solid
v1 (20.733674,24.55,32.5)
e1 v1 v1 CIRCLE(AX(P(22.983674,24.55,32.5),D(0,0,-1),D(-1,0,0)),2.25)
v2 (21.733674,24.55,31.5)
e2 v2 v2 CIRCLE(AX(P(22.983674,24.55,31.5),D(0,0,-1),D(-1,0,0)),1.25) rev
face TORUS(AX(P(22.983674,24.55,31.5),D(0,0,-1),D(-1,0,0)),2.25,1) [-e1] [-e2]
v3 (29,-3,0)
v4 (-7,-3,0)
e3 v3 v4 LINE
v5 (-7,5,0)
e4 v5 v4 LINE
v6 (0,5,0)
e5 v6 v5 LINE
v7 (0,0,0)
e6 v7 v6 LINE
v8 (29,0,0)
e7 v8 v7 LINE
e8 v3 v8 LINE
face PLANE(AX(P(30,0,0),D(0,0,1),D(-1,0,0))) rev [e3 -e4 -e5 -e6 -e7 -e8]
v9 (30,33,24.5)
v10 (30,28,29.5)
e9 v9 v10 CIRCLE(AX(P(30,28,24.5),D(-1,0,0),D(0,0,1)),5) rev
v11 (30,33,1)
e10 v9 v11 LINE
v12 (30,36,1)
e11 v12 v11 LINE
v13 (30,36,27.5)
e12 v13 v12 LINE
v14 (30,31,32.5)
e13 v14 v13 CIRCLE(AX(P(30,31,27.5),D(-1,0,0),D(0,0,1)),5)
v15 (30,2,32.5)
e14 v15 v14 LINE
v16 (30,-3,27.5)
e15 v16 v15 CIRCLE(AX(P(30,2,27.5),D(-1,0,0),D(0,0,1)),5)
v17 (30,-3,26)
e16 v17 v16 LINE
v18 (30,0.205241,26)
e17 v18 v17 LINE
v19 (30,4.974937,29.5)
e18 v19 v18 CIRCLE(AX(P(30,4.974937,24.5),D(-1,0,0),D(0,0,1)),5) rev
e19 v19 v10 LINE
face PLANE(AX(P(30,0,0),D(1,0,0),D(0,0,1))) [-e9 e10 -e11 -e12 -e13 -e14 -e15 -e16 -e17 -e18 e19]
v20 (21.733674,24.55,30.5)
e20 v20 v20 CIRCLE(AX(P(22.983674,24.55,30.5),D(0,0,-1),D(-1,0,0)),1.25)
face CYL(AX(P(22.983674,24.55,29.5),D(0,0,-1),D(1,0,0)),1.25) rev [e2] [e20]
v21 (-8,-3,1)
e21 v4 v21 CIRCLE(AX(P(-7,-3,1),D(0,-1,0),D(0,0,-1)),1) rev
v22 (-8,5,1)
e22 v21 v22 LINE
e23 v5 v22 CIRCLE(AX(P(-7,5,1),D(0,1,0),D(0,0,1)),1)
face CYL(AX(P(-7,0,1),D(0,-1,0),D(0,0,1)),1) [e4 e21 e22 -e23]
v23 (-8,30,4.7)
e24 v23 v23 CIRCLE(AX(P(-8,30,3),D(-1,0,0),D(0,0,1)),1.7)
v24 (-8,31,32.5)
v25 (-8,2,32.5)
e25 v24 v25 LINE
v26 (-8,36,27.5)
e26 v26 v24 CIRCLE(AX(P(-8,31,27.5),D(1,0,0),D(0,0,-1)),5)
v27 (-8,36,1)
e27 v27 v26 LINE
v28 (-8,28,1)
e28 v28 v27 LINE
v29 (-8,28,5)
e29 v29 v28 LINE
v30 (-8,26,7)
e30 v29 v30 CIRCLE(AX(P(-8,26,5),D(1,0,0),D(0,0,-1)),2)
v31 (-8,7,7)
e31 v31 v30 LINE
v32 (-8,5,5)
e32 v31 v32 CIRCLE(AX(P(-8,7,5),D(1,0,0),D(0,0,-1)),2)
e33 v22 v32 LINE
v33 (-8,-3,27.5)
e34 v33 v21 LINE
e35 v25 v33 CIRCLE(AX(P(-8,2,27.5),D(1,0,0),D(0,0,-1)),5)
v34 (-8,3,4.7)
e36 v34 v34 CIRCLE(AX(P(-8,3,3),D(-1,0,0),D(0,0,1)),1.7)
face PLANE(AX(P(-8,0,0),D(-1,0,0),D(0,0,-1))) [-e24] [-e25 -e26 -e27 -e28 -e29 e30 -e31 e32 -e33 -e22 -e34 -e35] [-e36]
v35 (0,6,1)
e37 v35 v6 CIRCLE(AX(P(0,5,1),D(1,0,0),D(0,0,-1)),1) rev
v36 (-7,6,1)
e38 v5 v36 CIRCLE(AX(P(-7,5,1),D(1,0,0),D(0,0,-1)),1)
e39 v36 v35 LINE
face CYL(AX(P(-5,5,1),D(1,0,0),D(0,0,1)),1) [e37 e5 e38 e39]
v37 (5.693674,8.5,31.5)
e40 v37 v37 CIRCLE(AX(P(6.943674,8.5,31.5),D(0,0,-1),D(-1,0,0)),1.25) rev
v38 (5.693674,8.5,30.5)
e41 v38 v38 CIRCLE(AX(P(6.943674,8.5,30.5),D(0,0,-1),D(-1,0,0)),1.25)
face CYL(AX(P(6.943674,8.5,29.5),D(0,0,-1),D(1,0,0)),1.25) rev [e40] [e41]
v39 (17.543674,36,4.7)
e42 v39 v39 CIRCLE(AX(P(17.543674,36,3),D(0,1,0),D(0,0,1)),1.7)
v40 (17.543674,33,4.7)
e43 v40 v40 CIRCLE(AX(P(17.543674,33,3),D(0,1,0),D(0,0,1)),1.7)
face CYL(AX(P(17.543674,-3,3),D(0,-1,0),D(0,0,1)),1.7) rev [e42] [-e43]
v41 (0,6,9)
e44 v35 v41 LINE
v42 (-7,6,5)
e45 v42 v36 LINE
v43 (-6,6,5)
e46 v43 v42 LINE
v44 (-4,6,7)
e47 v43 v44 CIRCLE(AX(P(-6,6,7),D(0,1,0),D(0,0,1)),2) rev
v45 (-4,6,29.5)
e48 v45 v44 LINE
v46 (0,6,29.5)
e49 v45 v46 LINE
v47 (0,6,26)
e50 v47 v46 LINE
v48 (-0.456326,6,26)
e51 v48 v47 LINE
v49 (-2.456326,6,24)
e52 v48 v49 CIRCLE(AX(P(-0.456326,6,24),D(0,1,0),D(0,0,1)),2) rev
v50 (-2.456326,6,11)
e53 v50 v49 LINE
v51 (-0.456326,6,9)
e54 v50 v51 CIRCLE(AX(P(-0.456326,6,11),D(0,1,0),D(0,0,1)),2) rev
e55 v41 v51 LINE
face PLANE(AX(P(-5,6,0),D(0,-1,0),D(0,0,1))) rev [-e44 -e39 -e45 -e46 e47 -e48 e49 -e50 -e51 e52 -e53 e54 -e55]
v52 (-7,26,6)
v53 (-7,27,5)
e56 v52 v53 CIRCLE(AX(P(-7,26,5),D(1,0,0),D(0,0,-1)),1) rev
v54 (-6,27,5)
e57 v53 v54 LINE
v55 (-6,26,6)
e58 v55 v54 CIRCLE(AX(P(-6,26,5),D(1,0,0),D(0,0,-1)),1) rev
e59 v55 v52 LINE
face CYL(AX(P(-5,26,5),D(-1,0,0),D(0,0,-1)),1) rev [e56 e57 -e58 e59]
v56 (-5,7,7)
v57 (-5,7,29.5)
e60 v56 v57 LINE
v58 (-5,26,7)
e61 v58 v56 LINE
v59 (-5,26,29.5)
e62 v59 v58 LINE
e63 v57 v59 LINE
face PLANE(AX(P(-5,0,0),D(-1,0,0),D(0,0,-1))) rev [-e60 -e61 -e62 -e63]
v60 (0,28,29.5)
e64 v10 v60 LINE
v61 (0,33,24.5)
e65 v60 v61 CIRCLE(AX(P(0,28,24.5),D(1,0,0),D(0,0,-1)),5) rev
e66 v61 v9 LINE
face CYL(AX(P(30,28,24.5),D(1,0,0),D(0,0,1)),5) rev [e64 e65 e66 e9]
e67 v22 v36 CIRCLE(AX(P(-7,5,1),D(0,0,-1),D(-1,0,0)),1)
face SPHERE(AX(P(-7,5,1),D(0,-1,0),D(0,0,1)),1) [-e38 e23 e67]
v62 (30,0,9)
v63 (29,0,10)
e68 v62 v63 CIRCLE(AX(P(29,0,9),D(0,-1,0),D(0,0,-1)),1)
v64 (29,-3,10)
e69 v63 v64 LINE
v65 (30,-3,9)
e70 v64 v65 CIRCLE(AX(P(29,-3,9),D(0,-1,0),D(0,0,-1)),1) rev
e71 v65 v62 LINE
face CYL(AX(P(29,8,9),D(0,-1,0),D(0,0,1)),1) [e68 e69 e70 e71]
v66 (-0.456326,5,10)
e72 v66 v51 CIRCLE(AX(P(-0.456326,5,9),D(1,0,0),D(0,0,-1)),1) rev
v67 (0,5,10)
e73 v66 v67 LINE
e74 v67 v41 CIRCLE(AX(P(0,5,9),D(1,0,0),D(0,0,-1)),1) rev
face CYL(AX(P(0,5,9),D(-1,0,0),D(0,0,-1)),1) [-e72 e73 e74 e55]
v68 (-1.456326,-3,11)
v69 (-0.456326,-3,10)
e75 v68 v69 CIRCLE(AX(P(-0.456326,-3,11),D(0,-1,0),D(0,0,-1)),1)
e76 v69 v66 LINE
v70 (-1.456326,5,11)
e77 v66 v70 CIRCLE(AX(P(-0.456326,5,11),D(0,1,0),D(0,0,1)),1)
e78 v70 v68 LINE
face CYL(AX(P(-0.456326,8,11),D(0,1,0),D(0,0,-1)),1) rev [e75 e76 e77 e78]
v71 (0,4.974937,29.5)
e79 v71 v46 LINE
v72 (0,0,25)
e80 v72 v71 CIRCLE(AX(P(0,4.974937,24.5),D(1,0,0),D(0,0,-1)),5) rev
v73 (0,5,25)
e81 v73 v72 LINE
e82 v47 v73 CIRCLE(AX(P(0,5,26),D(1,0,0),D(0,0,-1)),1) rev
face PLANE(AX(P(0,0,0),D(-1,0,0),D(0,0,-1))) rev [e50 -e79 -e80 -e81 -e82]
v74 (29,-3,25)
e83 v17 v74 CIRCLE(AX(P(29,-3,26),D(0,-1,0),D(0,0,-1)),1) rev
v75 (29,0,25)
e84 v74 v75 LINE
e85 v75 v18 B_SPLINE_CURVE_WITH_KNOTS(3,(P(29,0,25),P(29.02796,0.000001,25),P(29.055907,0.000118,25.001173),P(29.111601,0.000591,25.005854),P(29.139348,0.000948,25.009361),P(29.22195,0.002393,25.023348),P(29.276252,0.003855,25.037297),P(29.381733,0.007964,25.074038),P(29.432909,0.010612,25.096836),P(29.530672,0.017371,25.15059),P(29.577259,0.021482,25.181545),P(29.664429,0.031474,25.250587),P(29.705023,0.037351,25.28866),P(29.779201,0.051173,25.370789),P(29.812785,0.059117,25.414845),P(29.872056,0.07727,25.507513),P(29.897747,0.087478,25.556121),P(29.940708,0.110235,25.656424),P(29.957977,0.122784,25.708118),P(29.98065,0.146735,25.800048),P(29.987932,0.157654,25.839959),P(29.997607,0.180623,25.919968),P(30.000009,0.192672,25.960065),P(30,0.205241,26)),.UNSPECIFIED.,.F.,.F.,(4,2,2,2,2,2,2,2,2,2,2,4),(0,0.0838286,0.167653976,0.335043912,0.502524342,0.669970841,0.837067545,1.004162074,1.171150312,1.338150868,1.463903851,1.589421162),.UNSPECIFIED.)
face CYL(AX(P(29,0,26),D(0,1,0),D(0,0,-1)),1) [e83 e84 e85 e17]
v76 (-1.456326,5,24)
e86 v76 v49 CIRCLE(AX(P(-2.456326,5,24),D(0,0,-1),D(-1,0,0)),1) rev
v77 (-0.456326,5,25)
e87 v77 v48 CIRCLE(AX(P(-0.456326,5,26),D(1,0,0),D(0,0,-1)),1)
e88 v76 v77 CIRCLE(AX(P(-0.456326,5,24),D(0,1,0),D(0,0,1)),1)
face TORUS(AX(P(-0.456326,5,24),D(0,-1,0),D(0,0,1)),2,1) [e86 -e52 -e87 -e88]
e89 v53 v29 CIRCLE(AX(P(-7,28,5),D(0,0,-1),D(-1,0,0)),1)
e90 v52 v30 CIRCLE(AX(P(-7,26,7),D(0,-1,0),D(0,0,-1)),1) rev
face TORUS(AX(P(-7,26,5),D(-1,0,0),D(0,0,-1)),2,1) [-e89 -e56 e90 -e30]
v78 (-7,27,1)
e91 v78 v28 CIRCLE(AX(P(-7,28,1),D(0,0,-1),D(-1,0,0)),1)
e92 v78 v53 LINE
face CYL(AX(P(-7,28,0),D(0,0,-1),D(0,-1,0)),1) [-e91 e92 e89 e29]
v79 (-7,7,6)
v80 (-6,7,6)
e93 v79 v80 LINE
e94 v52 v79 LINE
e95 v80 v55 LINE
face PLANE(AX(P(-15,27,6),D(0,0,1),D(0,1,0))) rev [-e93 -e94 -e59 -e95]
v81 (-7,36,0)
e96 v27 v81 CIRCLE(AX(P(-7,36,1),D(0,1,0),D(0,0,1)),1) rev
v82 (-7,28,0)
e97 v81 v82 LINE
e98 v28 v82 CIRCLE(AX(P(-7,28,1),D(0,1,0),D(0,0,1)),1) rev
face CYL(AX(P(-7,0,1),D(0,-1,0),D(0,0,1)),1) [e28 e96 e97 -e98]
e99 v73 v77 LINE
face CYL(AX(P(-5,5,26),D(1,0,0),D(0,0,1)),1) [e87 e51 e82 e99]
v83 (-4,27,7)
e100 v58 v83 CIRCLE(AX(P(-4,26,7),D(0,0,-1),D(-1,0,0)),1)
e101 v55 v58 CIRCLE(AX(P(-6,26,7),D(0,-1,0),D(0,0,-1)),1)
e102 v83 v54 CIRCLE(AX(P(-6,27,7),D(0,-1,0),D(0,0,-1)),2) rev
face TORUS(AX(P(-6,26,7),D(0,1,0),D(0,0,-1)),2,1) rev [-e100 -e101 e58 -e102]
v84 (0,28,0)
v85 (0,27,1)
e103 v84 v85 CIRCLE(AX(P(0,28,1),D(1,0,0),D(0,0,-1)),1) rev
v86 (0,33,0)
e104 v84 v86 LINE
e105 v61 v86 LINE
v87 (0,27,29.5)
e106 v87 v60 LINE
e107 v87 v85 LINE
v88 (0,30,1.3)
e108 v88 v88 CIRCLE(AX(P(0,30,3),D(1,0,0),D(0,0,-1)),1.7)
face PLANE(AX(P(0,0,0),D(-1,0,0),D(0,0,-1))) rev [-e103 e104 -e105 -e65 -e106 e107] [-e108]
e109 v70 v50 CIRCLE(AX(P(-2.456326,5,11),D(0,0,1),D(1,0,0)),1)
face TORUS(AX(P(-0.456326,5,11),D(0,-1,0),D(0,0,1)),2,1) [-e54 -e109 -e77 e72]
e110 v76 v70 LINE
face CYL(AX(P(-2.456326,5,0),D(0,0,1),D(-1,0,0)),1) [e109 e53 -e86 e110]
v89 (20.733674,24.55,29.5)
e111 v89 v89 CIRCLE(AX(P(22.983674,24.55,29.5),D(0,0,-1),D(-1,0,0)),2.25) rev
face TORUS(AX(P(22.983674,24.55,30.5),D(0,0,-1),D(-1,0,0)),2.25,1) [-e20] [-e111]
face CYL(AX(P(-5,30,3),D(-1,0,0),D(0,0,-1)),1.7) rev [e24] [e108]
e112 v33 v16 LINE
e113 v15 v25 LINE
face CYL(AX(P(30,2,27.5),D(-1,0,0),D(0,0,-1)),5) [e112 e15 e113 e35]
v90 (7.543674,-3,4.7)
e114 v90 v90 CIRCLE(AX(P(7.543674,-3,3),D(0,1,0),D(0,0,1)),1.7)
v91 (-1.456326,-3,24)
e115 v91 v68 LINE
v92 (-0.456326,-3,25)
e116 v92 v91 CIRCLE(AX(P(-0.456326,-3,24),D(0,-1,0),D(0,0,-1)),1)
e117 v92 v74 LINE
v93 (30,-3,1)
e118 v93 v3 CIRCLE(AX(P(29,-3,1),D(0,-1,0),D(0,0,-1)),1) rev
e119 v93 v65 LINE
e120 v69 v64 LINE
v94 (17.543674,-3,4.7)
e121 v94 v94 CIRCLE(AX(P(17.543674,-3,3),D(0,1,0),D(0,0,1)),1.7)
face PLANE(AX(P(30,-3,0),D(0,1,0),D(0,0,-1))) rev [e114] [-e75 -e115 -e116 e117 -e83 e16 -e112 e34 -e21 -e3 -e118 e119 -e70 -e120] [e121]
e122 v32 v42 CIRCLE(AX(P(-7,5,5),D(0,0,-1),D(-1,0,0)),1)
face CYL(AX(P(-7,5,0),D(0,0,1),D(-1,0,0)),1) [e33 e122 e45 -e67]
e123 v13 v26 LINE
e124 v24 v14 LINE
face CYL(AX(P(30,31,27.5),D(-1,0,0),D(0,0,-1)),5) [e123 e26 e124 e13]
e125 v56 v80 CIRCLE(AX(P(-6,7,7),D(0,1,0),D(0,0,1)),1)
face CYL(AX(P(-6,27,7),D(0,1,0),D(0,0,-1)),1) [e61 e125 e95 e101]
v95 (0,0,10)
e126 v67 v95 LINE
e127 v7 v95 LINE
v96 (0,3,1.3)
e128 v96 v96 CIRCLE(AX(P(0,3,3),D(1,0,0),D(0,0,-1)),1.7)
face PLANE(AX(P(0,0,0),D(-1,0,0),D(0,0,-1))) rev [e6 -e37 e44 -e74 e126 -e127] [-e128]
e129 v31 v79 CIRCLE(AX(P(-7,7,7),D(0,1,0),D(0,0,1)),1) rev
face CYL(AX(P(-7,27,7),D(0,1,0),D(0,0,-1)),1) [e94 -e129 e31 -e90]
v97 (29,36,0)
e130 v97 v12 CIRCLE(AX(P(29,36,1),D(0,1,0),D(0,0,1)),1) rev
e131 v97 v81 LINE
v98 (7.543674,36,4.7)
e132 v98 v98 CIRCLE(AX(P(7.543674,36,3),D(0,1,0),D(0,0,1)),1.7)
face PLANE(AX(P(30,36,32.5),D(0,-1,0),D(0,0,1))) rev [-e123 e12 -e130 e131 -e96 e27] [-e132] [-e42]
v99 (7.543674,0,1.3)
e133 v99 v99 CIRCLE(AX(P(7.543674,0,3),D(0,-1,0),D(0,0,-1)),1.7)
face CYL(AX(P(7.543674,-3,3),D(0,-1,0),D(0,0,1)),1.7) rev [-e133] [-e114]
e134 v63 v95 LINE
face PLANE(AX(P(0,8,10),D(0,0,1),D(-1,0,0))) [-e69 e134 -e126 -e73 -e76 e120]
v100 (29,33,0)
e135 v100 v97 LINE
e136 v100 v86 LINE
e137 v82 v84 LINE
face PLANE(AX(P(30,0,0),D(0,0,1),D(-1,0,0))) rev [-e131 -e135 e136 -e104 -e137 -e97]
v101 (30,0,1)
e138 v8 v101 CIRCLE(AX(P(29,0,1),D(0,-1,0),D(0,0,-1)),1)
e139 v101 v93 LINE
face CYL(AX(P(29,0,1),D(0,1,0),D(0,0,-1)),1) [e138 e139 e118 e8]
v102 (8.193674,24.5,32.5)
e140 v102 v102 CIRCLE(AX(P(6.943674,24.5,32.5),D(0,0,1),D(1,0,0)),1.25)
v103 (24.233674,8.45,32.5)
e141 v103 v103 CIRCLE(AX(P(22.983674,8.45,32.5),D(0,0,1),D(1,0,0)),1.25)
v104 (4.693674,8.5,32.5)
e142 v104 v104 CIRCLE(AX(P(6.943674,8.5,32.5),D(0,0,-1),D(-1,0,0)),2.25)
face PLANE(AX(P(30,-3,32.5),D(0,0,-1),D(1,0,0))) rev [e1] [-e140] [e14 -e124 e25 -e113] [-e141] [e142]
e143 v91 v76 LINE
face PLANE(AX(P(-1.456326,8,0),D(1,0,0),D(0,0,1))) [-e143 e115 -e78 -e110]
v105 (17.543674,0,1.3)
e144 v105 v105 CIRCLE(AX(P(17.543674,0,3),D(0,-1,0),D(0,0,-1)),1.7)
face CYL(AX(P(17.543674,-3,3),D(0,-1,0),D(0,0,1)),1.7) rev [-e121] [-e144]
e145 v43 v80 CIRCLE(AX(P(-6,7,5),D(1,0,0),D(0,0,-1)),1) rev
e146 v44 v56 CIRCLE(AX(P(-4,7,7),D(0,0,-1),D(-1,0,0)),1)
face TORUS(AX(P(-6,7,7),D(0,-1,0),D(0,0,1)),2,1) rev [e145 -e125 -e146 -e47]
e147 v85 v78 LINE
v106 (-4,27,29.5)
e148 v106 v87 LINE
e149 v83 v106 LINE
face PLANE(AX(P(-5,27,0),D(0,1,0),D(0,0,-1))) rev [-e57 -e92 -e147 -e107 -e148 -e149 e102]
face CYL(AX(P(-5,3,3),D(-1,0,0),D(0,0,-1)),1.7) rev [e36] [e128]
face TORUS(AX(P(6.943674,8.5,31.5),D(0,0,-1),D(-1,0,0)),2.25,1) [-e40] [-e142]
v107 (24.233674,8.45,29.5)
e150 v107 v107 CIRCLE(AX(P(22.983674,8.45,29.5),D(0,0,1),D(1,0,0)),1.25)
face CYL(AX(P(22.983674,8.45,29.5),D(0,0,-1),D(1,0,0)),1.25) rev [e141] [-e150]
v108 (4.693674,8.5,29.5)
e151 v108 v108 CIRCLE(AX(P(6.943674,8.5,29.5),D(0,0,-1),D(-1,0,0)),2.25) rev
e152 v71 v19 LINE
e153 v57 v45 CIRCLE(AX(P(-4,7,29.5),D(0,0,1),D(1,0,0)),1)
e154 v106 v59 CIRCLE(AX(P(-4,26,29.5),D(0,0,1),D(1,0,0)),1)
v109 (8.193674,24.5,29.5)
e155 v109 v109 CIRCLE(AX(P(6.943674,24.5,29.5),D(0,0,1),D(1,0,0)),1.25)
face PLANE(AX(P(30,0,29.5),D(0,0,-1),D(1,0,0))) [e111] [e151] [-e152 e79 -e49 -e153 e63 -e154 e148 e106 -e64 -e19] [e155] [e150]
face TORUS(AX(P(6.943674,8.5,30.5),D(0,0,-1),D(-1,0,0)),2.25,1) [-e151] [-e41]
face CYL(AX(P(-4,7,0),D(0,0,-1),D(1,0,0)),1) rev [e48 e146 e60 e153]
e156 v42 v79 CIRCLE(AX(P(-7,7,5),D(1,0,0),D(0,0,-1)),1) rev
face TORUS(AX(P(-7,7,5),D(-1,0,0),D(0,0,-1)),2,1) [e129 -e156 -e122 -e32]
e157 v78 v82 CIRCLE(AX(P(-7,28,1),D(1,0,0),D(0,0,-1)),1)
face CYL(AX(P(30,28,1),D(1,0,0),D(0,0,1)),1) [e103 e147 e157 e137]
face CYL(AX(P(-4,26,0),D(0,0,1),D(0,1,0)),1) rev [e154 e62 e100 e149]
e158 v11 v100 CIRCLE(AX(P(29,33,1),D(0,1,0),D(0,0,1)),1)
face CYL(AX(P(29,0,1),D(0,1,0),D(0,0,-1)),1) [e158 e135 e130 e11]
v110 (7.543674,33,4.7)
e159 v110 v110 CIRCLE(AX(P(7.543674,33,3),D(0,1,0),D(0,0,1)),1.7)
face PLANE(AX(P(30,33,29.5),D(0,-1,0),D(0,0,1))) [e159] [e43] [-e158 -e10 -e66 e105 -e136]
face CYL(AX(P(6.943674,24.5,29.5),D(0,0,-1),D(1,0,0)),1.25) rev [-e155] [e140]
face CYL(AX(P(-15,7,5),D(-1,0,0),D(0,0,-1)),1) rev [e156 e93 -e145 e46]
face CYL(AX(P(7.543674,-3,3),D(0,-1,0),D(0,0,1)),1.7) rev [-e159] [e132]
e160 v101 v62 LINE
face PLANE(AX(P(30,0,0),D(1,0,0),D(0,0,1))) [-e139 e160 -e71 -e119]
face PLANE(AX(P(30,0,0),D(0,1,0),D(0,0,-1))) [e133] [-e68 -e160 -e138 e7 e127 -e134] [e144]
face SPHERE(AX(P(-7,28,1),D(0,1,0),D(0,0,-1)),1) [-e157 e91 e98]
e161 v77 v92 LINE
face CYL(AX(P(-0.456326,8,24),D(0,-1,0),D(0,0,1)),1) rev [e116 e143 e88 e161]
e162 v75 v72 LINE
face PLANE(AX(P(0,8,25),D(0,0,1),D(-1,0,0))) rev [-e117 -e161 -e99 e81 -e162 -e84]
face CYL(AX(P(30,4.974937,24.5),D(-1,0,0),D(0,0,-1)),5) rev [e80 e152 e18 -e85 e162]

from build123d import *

# Parameters (mm, degrees)
EXTRUDE_1_DEPTH     = 30
HOLE_WIZARD_M4_1_D  = 2.5
SKETCH_13_W         = 3
SKETCH_13_H         = 21
SKETCH_13_W_2       = 29.5
SKETCH_13_H_2       = 6
EXTRUDE_2_DEPTH     = 5
HOLE_WIZARD_M3_1_D  = 3.4
HOLE_WIZARD_M3_2_D  = 3.4
SKETCH_18_W         = 33
SKETCH_18_H         = 15
CUT_EXTRUDE_1_DEPTH = 11
SKETCH_20_W         = 32.5
SKETCH_20_H         = 39
EXTRUDE_3_DEPTH     = 3
FILLET_3_R          = 5
FILLET_4_R          = 5
FILLET_5_R          = 1
HOLE_WIZARD_M3_3_D  = 3.4
SKETCH_25_W         = 6
SKETCH_25_H         = 21
CUT_EXTRUDE_3_DEPTH = 10
FILLET_6_R          = 1
FILLET1_R           = 1


with BuildPart() as part:
    # 草图1 → 凸台-拉伸1 (new body)
    with BuildSketch(Plane(origin=(0, 0, 0), x_dir=(0, 0, -1), z_dir=(1, 0, 0))):
        Polygon((0, 0), (29.5, 0), (29.5, 33), (0, 33), (0, 36), (32.5, 36), (32.5, -3), (0, -3), align=None)
    extrude(amount=EXTRUDE_1_DEPTH)

    # M4 间隙孔1 (through all)
    with Locations(Plane.XY.offset(-29.5)):
        with Locations((6.943673968, 24.5), (22.983673968, 24.55), (6.943673968, 8.5), (22.983673968, 8.45)):
            Hole(HOLE_WIZARD_M4_1_D / 2)

    # 草图13 → 凸台-拉伸2 (add)
    with BuildSketch(Plane(origin=(0, 0, 0), x_dir=(0, 0, -1), z_dir=(1, 0, 0))):
        with Locations((31, 16.5)):
            Rectangle(SKETCH_13_W, SKETCH_13_H)
        with Locations((14.75, 3)):
            Rectangle(SKETCH_13_W_2, SKETCH_13_H_2)
        Polygon((0, 0), (0, -3), (32.5, -3), (32.5, 6), (29.5, 6), (29.5, 0), align=None)
        with Locations((14.75, 30)):
            Rectangle(SKETCH_13_W_2, SKETCH_13_H_2)
        Polygon((29.5, 27), (32.5, 27), (32.5, 36), (0, 36), (0, 33), (29.5, 33), align=None)
    extrude(amount=-EXTRUDE_2_DEPTH)

    # M3 间隙孔1 (through all)
    with Locations(Plane(origin=(0, -3, 0), x_dir=(-1, 0, 0), z_dir=(0, -1, 0))):
        with Locations((-7.543673968, 3), (-17.543673968, 3)):
            Hole(HOLE_WIZARD_M3_1_D / 2)

    # M3 间隙孔2 (through all)
    with Locations(Plane.ZY.offset(5)):
        with Locations((-3, 30), (-3, 3)):
            Hole(HOLE_WIZARD_M3_2_D / 2)

    # 草图18 → 切除-拉伸1 (cut)
    with BuildSketch(Plane.XZ.offset(3)):
        with Locations((15.043673968, -17.5)):
            Rectangle(SKETCH_18_W, SKETCH_18_H)
    extrude(amount=-CUT_EXTRUDE_1_DEPTH, mode=Mode.SUBTRACT)

    # 草图20 → 凸台-拉伸3 (add)
    with BuildSketch(Plane.ZY.offset(5)):
        with Locations((-16.25, 16.5)):
            Rectangle(SKETCH_20_W, SKETCH_20_H)
    extrude(amount=EXTRUDE_3_DEPTH)

    # 圆角3
    fillet_3_edges = [part.edges().sort_by_distance(p)[0] for p in [
        (11, -3, -32.5),
        (11, 36, -32.5),
    ]]
    fillet(fillet_3_edges, radius=FILLET_3_R)

    # 圆角4
    # the kernel refuses this fillet: 5 mm, written as the material it adds along each edge
    with BuildSketch(Plane(origin=(0, 33, -29.5), x_dir=(0, -1, 0), z_dir=(1, 0, 0))) as fillet_4_piece_1:
        with BuildLine():
            CenterArc((FILLET_4_R, -FILLET_4_R), FILLET_4_R, 90, 90)
            Line((0, -FILLET_4_R), (0, 0))
            Line((0, 0), (FILLET_4_R, 0))
        make_face()
    extrude(amount=30)
    with BuildSketch(Plane(origin=(0, 0, -29.5), x_dir=(0, 0, 1), z_dir=(1, 0, 0))) as fillet_4_piece_2:
        with BuildLine():
            CenterArc((5, -4.974937186), FILLET_4_R, 95.739170477, 84.260829523)
            Line((0, -4.974937186), (0, 0))
            Line((0, 0), (4.5, 0))
        make_face()
    extrude(amount=30)

    # 圆角5
    fillet_5_edges = [part.edges().sort_by_distance(p)[0] for p in [
        (-1.456326032, 6, -17.5),
        (-0.728163016, 6, -25),
        (-0.728163016, 6, -10),
        (-1.456326032, 1.5, -25),
        (-1.456326032, 1.5, -10),
        (30, -1.5, -10),
        (30, -1.5, -25),
        (30, 34.5, 0),
        (-8, 16.5, 0),
        (30, -1.5, 0),
    ]]
    fillet(fillet_5_edges, radius=FILLET_5_R)

    # M3 间隙孔3 (through all)
    with Locations(Plane(origin=(-5, 0, 0), x_dir=(0, 0, -1), z_dir=(1, 0, 0))):
        with Locations((3, 30), (3, 3)):
            Hole(HOLE_WIZARD_M3_3_D / 2)

    # 草图25 → 切除-拉伸3 (cut)
    with BuildSketch(Plane(origin=(-5, 0, 0), x_dir=(0, 0, -1), z_dir=(1, 0, 0))):
        with Locations((3, 16.5)):
            Rectangle(SKETCH_25_W, SKETCH_25_H)
    extrude(amount=-CUT_EXTRUDE_3_DEPTH, mode=Mode.SUBTRACT)

    # 圆角6
    fillet_6_edges = [part.edges().sort_by_distance(p)[0] for p in [
        (-7.707106781, 6, -0.292893219),
        (-7.707106781, 27, -0.292893219),
        (-5, 6, -17.75),
        (-8, 16.5, -6),
        (-8, 27, -3.5),
        (-8, 6, -3.5),
        (-6.5, 27, -6),
        (-6.5, 6, -6),
        (-5, 16.5, -6),
        (-3.5, 6, 0),
        (-3.5, 27, 0),
        (-5, 27, -17.75),
    ]]
    fillet(fillet_6_edges, radius=FILLET_6_R)


with BuildPart() as body_2:
    # 镜向2: mirrored copy
    add(part.part.mirror(Plane(origin=(30, 0, 0), x_dir=(1, 0, 0), z_dir=(0, 0, -1))))

    # Fillet1
    fillet1_edges = [body_2.edges().sort_by_distance(p)[0] for p in [
        (8.193673968, 8.5, 29.5),
        (8.193673968, 8.5, 32.5),
        (24.233673968, 24.55, 29.5),
        (24.233673968, 24.55, 32.5),
    ]]
    fillet(fillet1_edges, radius=FILLET1_R)


solid = body_2.part
